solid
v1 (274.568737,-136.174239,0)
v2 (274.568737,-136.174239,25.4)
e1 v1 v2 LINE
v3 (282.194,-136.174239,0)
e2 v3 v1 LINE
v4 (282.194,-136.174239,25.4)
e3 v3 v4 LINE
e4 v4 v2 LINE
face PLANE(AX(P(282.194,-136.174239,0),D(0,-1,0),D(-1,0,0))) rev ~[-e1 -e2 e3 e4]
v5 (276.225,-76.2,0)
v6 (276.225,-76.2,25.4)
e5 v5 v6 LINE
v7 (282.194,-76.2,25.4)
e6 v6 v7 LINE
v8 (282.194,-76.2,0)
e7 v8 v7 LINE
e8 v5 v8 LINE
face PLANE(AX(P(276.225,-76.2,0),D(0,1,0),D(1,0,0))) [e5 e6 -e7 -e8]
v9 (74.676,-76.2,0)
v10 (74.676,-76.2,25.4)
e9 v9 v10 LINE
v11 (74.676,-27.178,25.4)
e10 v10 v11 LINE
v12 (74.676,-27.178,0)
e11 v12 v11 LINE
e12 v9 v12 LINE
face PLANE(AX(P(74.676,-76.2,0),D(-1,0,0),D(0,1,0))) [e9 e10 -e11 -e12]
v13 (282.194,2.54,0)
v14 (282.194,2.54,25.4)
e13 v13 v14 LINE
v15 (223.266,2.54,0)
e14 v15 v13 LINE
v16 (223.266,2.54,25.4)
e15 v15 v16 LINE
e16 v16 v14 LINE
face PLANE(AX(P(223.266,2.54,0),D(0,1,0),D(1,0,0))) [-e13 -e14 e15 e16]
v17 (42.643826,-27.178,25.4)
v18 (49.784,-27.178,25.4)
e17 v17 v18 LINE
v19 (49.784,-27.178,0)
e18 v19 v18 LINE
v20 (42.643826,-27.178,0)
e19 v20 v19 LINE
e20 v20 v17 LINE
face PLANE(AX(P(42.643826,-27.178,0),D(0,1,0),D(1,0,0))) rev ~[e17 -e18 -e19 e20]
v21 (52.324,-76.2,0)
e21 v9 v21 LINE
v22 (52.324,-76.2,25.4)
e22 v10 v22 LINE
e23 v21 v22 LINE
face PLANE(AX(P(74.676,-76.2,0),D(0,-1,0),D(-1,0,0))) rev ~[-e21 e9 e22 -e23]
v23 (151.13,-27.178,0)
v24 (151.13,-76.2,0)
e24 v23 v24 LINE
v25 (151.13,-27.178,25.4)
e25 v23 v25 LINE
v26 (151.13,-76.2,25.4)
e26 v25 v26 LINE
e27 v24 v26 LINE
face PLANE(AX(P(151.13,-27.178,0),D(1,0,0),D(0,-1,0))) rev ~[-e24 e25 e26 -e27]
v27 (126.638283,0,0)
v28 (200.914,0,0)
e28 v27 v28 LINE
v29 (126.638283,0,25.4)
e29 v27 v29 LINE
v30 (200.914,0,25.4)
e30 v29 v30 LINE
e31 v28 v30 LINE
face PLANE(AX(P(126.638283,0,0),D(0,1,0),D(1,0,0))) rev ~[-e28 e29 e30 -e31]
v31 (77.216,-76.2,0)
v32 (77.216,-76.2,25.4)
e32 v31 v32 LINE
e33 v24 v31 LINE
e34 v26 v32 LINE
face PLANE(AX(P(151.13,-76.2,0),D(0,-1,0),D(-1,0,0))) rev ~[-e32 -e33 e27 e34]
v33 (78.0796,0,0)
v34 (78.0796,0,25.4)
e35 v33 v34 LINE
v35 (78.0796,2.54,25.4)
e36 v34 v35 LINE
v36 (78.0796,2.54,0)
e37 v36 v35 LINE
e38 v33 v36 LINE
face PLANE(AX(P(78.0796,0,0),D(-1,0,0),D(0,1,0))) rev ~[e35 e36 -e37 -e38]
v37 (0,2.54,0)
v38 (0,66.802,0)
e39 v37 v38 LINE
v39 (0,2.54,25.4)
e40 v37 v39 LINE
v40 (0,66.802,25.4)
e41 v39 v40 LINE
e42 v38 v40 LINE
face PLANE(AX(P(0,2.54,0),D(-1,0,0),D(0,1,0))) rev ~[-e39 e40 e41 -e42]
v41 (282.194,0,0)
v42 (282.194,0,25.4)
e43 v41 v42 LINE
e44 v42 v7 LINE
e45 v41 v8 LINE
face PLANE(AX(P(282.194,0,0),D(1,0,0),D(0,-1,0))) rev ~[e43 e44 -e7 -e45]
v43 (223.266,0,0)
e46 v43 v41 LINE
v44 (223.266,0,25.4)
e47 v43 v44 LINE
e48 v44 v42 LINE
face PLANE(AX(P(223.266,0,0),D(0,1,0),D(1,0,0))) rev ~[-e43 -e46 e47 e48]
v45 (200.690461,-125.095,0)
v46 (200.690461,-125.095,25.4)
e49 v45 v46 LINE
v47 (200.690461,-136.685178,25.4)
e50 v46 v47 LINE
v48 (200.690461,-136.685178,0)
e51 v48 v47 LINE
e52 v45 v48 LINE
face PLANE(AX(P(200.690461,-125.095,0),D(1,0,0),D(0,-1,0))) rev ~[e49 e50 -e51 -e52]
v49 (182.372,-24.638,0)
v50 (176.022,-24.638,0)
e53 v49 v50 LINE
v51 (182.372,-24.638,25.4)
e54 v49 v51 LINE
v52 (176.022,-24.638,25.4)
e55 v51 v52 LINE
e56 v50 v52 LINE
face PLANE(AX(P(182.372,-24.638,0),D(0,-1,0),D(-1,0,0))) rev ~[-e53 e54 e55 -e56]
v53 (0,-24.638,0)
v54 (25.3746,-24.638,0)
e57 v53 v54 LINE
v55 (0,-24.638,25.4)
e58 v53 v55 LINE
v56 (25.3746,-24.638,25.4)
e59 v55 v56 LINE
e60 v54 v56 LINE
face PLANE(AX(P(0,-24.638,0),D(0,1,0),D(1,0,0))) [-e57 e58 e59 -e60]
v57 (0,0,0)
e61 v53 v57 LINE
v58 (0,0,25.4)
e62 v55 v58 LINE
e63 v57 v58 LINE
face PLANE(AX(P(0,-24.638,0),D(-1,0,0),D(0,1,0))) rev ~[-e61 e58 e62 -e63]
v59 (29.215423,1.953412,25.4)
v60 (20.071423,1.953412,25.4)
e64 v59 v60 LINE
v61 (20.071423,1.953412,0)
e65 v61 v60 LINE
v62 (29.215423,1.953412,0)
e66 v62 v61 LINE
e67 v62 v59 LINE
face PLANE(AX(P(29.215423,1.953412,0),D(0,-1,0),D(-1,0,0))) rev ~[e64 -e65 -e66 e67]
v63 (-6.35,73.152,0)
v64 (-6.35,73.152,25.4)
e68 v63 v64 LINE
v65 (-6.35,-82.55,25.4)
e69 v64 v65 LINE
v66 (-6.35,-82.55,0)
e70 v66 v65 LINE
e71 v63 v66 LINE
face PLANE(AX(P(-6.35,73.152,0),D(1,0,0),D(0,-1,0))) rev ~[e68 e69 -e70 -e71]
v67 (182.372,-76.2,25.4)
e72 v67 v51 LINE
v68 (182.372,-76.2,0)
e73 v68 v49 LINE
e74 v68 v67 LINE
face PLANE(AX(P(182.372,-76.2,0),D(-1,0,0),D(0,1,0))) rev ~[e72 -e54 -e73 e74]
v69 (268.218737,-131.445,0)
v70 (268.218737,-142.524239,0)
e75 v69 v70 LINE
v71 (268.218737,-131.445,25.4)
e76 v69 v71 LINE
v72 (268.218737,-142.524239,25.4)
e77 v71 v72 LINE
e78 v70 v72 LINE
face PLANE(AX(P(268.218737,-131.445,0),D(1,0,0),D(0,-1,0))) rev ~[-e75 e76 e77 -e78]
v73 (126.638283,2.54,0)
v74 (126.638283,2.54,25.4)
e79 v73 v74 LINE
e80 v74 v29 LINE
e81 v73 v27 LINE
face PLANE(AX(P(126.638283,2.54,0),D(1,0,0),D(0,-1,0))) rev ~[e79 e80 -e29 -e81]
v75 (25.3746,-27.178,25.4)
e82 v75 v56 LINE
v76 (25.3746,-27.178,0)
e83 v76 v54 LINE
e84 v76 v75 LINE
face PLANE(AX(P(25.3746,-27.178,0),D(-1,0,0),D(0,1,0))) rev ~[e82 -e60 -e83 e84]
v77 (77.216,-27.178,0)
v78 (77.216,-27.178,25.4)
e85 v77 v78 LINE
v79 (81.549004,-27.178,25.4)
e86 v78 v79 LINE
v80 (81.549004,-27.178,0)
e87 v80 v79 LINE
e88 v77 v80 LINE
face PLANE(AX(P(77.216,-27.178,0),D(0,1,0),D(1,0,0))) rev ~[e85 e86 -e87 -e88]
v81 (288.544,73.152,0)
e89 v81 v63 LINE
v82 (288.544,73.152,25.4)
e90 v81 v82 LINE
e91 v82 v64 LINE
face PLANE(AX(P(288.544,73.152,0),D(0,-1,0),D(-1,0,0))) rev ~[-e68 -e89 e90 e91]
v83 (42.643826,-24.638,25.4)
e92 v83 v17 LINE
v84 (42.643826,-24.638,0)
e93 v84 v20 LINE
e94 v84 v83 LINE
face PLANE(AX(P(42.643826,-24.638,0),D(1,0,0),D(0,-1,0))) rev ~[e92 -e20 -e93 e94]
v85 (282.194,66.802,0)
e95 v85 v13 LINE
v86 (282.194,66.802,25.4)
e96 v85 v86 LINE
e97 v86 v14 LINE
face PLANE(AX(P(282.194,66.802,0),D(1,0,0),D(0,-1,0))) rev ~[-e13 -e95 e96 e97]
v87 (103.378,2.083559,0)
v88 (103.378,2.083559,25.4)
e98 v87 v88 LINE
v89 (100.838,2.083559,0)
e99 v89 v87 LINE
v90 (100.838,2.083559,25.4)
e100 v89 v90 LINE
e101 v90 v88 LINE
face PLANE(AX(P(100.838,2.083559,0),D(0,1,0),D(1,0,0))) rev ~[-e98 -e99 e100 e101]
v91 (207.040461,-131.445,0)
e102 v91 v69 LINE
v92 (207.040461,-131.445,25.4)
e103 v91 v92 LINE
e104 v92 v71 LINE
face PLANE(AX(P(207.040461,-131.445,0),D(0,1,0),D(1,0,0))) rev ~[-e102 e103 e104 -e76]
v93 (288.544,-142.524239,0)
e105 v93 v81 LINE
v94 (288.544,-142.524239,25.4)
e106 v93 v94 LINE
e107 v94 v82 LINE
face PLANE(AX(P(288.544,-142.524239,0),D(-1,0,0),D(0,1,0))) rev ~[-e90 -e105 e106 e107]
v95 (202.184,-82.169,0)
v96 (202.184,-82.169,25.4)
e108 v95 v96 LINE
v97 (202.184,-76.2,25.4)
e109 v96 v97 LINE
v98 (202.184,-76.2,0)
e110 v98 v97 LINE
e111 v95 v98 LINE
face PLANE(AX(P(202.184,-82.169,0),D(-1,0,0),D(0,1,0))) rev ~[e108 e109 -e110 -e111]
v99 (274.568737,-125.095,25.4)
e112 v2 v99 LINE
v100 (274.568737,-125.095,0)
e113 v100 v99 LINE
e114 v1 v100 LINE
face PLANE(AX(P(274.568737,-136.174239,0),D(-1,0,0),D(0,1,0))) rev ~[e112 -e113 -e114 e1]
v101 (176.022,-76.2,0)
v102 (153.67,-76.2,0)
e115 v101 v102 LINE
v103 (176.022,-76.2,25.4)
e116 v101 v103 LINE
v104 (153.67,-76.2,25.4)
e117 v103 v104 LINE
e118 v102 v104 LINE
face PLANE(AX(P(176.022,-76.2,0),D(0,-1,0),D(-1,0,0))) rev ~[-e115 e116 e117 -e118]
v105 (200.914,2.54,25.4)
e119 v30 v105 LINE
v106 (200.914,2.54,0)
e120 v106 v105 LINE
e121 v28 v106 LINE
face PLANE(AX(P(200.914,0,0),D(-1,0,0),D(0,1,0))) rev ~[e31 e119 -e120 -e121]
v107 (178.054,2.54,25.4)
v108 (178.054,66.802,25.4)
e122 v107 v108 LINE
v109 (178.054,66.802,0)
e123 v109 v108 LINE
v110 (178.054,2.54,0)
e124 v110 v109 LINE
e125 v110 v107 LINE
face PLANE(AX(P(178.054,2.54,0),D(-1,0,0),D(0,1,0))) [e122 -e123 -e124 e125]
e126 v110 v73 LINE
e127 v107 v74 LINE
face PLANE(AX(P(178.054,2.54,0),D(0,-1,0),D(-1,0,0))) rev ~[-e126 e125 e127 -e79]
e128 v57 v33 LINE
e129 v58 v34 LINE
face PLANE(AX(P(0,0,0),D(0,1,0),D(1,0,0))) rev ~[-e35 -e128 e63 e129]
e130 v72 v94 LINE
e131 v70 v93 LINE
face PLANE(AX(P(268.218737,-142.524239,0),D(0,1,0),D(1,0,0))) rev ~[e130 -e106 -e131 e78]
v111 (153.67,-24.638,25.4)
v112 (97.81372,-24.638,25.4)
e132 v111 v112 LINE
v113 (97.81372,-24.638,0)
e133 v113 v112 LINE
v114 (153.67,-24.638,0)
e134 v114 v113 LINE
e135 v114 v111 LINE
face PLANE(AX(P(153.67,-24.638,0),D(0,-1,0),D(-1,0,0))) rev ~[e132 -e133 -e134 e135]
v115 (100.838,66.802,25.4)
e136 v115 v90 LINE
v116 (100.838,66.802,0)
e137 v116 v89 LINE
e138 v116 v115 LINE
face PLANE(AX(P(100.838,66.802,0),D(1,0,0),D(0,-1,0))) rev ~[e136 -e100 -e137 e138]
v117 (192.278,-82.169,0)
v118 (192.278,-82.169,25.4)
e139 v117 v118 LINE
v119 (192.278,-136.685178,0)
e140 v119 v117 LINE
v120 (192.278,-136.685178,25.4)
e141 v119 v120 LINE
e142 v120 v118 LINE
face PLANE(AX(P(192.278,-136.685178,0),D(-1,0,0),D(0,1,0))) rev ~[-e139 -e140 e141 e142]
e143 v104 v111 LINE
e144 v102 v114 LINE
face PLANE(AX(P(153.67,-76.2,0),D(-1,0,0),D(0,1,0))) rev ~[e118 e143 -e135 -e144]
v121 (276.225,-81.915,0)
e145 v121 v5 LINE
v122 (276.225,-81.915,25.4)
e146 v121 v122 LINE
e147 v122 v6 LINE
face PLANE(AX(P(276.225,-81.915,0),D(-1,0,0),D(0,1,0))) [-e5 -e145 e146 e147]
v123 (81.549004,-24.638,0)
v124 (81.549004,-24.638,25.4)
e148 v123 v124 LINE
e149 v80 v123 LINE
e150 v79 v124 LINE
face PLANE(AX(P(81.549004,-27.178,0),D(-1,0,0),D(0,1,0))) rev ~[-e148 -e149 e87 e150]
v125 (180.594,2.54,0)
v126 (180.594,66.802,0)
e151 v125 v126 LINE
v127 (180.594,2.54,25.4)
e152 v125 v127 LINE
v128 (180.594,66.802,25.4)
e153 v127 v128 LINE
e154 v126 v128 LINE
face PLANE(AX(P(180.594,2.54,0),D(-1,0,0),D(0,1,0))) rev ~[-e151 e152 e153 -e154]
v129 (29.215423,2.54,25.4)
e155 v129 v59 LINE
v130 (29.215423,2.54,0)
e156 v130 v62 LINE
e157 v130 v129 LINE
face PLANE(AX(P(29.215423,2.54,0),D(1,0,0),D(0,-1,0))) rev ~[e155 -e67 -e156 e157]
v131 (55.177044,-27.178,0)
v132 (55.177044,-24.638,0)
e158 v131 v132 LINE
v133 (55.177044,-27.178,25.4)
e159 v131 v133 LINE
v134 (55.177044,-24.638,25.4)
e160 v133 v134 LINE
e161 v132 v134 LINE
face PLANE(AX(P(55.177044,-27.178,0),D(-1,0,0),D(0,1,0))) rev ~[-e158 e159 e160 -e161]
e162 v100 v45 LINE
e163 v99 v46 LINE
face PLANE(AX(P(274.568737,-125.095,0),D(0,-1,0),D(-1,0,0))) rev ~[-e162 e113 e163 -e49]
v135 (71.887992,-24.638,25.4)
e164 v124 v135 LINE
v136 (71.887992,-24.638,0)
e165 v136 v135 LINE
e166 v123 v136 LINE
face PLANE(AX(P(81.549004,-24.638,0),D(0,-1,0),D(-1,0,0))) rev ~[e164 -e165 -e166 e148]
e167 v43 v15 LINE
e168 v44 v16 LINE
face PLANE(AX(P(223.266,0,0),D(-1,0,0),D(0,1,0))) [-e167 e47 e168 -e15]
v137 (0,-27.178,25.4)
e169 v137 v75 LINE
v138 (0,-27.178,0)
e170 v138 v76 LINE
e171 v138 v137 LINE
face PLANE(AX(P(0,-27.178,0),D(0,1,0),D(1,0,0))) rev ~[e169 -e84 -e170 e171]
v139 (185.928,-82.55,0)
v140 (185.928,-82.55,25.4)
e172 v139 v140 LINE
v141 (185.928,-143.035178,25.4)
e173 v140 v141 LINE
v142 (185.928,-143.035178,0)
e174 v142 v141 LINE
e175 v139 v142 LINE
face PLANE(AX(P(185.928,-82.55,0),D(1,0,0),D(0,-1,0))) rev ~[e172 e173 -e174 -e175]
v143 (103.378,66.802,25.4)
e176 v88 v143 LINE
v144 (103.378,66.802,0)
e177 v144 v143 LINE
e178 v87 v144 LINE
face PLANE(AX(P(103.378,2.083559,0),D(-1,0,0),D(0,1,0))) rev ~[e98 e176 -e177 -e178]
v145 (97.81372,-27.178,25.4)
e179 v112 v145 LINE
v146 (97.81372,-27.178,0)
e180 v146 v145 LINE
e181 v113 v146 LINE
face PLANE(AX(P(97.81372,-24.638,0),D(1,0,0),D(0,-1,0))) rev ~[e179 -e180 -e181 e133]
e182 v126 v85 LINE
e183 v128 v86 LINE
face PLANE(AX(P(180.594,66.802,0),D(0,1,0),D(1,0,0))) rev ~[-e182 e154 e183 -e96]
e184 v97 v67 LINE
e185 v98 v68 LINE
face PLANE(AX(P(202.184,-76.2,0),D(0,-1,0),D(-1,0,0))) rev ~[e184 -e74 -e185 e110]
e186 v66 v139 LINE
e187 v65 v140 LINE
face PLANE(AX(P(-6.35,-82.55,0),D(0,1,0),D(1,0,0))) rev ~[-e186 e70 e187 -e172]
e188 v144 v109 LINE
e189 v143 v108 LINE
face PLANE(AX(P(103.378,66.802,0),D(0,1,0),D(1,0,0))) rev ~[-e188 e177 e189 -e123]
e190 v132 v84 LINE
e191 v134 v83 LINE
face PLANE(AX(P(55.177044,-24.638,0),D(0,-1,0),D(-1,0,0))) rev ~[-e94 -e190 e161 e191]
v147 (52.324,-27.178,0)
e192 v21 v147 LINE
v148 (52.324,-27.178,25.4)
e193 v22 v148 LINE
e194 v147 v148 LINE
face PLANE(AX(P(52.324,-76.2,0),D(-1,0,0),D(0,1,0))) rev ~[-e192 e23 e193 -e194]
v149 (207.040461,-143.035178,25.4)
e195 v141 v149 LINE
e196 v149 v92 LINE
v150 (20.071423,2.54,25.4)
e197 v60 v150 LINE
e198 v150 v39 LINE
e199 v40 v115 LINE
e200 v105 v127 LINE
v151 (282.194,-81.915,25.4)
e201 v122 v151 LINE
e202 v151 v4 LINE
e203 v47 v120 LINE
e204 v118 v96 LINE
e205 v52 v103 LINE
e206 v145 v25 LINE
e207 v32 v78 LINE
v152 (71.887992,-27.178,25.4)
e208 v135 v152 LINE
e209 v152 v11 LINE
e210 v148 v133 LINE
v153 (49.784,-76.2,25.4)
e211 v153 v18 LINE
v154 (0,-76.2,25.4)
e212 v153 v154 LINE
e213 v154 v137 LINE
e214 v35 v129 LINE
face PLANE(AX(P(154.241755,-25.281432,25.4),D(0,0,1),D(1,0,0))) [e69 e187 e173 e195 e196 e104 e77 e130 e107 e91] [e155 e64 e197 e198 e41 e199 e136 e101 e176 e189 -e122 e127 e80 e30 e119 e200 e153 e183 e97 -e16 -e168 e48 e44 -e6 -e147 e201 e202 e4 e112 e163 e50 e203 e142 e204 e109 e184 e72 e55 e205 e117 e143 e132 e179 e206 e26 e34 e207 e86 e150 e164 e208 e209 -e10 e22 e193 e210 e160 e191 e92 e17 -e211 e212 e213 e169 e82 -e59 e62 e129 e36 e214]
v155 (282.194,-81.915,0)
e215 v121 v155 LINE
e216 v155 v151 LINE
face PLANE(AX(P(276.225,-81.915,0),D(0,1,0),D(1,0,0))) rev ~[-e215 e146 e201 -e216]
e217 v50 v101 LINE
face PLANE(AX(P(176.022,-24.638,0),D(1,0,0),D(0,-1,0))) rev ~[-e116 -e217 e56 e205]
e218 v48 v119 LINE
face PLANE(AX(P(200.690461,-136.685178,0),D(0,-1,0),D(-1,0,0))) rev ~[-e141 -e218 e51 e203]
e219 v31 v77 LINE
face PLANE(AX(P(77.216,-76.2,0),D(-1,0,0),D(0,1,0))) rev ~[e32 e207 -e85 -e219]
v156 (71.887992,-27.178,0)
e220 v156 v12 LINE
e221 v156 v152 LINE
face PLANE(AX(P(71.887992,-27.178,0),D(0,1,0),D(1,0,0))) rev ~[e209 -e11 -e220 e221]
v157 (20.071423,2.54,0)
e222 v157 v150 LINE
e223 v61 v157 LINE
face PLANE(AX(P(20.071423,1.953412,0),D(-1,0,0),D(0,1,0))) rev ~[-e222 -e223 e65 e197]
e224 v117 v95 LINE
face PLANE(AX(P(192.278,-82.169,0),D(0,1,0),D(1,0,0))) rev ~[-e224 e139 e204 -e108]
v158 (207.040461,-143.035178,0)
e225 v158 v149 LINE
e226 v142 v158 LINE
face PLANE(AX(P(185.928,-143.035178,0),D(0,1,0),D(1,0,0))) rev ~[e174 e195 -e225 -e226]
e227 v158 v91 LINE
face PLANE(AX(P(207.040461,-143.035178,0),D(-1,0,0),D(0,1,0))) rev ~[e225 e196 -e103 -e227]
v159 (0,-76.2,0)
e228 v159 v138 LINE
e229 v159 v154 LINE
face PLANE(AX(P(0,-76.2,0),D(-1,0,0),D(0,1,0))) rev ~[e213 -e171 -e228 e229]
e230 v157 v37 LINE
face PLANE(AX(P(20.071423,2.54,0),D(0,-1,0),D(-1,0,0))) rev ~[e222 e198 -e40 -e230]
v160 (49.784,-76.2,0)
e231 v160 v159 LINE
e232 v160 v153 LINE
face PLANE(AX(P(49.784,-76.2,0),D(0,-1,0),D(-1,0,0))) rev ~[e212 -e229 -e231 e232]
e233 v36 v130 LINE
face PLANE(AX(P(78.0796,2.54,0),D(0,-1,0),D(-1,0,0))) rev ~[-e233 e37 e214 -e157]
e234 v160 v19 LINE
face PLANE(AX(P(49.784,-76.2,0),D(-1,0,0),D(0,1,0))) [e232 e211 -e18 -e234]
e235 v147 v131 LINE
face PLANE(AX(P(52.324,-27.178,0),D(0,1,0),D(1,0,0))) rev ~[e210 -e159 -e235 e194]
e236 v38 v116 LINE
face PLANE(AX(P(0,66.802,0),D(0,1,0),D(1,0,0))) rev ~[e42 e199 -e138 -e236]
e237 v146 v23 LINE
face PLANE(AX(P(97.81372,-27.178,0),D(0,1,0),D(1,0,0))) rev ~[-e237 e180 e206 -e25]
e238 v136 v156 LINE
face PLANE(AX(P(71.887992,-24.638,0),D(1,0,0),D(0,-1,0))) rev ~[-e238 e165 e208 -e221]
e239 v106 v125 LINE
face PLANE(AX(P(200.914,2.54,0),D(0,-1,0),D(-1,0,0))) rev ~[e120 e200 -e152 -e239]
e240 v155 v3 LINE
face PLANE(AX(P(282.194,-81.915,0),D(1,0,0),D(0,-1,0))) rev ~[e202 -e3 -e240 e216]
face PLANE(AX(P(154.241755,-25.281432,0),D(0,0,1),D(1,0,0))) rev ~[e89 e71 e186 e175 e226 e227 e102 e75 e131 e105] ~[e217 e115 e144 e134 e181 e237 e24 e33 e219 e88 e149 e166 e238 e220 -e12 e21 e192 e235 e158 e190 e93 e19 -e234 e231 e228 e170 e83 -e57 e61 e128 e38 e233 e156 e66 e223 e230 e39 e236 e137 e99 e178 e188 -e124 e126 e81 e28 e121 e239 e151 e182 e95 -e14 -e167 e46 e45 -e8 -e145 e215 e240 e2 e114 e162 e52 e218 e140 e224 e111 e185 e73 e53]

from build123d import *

# Parameters (mm, degrees)
F0_W     = 2.54
F0_H     = 64.262
F0_W_2   = 58.928
F0_H_2   = 2.54
F0_W_3   = 9.906
F0_H_3   = 5.969
F0_W_4   = 5.969
F0_H_4   = 5.715
F0_H_5   = 49.022
F0_W_5   = 25.3746
F1_DEPTH = 25.4


# Not quite as in the source:
# - a feature names something its author has since deleted; it is built from what else it names


with BuildPart() as f1:
    # F0 (on Top) → F1 (new body)
    with BuildSketch(Plane.XY):
        Polygon((-6.35, 73.152), (-6.35, -82.55), (185.928, -82.55), (185.928, -143.0351776838), (207.0404606759, -143.0351776838), (207.0404606759, -131.445), (268.2187365532, -131.445), (268.2187365532, -142.524239029), (288.544, -142.524239029), (288.544, -81.915), (288.544, 73.152), align=None)
        Polygon((0, 61.5773126483), (0, 66.802), (77.6735246181, 66.802), (100.838, 66.802), (103.378, 66.802), (178.054, 66.802), (180.594, 66.802), (282.194, 66.802), (282.194, 48.7640425563), (282.194, 2.54), (282.194, 0), (282.194, -64.607180655), (282.194, -76.2), (282.194, -81.915), (282.194, -136.174239029), (274.5687365532, -136.174239029), (274.5687365532, -125.095), (200.6904606759, -125.095), (200.6904606759, -136.6851776838), (192.278, -136.6851776838), (192.278, -82.169), (192.278, -76.2), (182.372, -76.2), (176.022, -76.2), (153.67, -76.2), (151.13, -76.2), (77.216, -76.2), (74.676, -76.2), (52.324, -76.2), (49.784, -76.2), (0, -76.2), (0, -27.178), (0, -24.638), (0, 0), (0, 2.54), (0, 17.2067563981), (0, 18.169073388), (0, 22.6956792176), align=None, mode=Mode.SUBTRACT)
        Polygon((18.6906643212, 2.54), (0, 2.54), (0, 0), (78.0796, 0), (78.0796, 2.54), (68.6789600206, 2.54), (68.1948126652, 2.54), (29.4852126652, 2.54), (29.2154226812, 2.54), (29.2154226812, 1.9534120802), (20.0714226812, 1.9534120802), (20.0714226812, 2.54), (19.6596, 2.54), align=None)
        Polygon((103.378, 66.802), (100.838, 66.802), (100.838, 48.322211951), (100.838, 2.0835588062), (103.378, 2.0835588062), align=None)
        Polygon((180.594, 2.54), (178.054, 2.54), (126.6382832546, 2.54), (126.6382832546, 0), (200.914, 0), (200.914, 2.54), (198.7368017435, 2.54), align=None)
        with Locations((179.324, 34.671)):
            Rectangle(F0_W, F0_H)
        with Locations((252.73, 1.27)):
            Rectangle(F0_W_2, F0_H_2)
        Polygon((176.022, -72.2413137555), (176.022, -76.2), (182.372, -76.2), (182.372, -66.0237371922), (182.372, -29.6653471887), (182.372, -24.638), (176.022, -24.638), (176.022, -31.1945881695), (176.022, -37.9491113126), (176.022, -44.4958023727), (176.022, -51.689), (176.022, -58.7322562933), (176.022, -65.4867812991), align=None)
        with Locations((197.231, -79.1845)):
            Rectangle(F0_W_3, F0_H_3)
        with Locations((279.2095, -79.0575)):
            Rectangle(F0_W_4, F0_H_4)
        Polygon((151.13, -64.7879913449), (151.13, -76.2), (153.67, -76.2), (153.67, -72.2413137555), (153.67, -65.4867812991), (153.67, -58.7322562933), (153.67, -51.689), (153.67, -46.2308526039), (153.67, -44.4958023727), (153.67, -37.9491113126), (153.67, -31.1945881695), (153.67, -27.178), (151.13, -27.178), (151.13, -46.2308526039), align=None)
        Polygon((97.8137195742, -27.178), (151.13, -27.178), (153.67, -27.178), (153.67, -24.638), (97.8137195742, -24.638), align=None)
        with Locations((75.946, -51.689)):
            Rectangle(F0_W, F0_H_5)
        Polygon((71.8879923224, -27.178), (74.676, -27.178), (77.216, -27.178), (81.5490037203, -27.178), (81.5490037203, -24.638), (71.8879923224, -24.638), align=None)
        with Locations((51.054, -51.689)):
            Rectangle(F0_W, F0_H_5)
        Polygon((42.6438264549, -27.178), (49.784, -27.178), (52.324, -27.178), (55.1770441234, -27.178), (55.1770441234, -24.638), (42.6438264549, -24.638), align=None)
        with Locations((12.6873, -25.908)):
            Rectangle(F0_W_5, F0_H_2)
    extrude(amount=F1_DEPTH)


solid = f1.part
